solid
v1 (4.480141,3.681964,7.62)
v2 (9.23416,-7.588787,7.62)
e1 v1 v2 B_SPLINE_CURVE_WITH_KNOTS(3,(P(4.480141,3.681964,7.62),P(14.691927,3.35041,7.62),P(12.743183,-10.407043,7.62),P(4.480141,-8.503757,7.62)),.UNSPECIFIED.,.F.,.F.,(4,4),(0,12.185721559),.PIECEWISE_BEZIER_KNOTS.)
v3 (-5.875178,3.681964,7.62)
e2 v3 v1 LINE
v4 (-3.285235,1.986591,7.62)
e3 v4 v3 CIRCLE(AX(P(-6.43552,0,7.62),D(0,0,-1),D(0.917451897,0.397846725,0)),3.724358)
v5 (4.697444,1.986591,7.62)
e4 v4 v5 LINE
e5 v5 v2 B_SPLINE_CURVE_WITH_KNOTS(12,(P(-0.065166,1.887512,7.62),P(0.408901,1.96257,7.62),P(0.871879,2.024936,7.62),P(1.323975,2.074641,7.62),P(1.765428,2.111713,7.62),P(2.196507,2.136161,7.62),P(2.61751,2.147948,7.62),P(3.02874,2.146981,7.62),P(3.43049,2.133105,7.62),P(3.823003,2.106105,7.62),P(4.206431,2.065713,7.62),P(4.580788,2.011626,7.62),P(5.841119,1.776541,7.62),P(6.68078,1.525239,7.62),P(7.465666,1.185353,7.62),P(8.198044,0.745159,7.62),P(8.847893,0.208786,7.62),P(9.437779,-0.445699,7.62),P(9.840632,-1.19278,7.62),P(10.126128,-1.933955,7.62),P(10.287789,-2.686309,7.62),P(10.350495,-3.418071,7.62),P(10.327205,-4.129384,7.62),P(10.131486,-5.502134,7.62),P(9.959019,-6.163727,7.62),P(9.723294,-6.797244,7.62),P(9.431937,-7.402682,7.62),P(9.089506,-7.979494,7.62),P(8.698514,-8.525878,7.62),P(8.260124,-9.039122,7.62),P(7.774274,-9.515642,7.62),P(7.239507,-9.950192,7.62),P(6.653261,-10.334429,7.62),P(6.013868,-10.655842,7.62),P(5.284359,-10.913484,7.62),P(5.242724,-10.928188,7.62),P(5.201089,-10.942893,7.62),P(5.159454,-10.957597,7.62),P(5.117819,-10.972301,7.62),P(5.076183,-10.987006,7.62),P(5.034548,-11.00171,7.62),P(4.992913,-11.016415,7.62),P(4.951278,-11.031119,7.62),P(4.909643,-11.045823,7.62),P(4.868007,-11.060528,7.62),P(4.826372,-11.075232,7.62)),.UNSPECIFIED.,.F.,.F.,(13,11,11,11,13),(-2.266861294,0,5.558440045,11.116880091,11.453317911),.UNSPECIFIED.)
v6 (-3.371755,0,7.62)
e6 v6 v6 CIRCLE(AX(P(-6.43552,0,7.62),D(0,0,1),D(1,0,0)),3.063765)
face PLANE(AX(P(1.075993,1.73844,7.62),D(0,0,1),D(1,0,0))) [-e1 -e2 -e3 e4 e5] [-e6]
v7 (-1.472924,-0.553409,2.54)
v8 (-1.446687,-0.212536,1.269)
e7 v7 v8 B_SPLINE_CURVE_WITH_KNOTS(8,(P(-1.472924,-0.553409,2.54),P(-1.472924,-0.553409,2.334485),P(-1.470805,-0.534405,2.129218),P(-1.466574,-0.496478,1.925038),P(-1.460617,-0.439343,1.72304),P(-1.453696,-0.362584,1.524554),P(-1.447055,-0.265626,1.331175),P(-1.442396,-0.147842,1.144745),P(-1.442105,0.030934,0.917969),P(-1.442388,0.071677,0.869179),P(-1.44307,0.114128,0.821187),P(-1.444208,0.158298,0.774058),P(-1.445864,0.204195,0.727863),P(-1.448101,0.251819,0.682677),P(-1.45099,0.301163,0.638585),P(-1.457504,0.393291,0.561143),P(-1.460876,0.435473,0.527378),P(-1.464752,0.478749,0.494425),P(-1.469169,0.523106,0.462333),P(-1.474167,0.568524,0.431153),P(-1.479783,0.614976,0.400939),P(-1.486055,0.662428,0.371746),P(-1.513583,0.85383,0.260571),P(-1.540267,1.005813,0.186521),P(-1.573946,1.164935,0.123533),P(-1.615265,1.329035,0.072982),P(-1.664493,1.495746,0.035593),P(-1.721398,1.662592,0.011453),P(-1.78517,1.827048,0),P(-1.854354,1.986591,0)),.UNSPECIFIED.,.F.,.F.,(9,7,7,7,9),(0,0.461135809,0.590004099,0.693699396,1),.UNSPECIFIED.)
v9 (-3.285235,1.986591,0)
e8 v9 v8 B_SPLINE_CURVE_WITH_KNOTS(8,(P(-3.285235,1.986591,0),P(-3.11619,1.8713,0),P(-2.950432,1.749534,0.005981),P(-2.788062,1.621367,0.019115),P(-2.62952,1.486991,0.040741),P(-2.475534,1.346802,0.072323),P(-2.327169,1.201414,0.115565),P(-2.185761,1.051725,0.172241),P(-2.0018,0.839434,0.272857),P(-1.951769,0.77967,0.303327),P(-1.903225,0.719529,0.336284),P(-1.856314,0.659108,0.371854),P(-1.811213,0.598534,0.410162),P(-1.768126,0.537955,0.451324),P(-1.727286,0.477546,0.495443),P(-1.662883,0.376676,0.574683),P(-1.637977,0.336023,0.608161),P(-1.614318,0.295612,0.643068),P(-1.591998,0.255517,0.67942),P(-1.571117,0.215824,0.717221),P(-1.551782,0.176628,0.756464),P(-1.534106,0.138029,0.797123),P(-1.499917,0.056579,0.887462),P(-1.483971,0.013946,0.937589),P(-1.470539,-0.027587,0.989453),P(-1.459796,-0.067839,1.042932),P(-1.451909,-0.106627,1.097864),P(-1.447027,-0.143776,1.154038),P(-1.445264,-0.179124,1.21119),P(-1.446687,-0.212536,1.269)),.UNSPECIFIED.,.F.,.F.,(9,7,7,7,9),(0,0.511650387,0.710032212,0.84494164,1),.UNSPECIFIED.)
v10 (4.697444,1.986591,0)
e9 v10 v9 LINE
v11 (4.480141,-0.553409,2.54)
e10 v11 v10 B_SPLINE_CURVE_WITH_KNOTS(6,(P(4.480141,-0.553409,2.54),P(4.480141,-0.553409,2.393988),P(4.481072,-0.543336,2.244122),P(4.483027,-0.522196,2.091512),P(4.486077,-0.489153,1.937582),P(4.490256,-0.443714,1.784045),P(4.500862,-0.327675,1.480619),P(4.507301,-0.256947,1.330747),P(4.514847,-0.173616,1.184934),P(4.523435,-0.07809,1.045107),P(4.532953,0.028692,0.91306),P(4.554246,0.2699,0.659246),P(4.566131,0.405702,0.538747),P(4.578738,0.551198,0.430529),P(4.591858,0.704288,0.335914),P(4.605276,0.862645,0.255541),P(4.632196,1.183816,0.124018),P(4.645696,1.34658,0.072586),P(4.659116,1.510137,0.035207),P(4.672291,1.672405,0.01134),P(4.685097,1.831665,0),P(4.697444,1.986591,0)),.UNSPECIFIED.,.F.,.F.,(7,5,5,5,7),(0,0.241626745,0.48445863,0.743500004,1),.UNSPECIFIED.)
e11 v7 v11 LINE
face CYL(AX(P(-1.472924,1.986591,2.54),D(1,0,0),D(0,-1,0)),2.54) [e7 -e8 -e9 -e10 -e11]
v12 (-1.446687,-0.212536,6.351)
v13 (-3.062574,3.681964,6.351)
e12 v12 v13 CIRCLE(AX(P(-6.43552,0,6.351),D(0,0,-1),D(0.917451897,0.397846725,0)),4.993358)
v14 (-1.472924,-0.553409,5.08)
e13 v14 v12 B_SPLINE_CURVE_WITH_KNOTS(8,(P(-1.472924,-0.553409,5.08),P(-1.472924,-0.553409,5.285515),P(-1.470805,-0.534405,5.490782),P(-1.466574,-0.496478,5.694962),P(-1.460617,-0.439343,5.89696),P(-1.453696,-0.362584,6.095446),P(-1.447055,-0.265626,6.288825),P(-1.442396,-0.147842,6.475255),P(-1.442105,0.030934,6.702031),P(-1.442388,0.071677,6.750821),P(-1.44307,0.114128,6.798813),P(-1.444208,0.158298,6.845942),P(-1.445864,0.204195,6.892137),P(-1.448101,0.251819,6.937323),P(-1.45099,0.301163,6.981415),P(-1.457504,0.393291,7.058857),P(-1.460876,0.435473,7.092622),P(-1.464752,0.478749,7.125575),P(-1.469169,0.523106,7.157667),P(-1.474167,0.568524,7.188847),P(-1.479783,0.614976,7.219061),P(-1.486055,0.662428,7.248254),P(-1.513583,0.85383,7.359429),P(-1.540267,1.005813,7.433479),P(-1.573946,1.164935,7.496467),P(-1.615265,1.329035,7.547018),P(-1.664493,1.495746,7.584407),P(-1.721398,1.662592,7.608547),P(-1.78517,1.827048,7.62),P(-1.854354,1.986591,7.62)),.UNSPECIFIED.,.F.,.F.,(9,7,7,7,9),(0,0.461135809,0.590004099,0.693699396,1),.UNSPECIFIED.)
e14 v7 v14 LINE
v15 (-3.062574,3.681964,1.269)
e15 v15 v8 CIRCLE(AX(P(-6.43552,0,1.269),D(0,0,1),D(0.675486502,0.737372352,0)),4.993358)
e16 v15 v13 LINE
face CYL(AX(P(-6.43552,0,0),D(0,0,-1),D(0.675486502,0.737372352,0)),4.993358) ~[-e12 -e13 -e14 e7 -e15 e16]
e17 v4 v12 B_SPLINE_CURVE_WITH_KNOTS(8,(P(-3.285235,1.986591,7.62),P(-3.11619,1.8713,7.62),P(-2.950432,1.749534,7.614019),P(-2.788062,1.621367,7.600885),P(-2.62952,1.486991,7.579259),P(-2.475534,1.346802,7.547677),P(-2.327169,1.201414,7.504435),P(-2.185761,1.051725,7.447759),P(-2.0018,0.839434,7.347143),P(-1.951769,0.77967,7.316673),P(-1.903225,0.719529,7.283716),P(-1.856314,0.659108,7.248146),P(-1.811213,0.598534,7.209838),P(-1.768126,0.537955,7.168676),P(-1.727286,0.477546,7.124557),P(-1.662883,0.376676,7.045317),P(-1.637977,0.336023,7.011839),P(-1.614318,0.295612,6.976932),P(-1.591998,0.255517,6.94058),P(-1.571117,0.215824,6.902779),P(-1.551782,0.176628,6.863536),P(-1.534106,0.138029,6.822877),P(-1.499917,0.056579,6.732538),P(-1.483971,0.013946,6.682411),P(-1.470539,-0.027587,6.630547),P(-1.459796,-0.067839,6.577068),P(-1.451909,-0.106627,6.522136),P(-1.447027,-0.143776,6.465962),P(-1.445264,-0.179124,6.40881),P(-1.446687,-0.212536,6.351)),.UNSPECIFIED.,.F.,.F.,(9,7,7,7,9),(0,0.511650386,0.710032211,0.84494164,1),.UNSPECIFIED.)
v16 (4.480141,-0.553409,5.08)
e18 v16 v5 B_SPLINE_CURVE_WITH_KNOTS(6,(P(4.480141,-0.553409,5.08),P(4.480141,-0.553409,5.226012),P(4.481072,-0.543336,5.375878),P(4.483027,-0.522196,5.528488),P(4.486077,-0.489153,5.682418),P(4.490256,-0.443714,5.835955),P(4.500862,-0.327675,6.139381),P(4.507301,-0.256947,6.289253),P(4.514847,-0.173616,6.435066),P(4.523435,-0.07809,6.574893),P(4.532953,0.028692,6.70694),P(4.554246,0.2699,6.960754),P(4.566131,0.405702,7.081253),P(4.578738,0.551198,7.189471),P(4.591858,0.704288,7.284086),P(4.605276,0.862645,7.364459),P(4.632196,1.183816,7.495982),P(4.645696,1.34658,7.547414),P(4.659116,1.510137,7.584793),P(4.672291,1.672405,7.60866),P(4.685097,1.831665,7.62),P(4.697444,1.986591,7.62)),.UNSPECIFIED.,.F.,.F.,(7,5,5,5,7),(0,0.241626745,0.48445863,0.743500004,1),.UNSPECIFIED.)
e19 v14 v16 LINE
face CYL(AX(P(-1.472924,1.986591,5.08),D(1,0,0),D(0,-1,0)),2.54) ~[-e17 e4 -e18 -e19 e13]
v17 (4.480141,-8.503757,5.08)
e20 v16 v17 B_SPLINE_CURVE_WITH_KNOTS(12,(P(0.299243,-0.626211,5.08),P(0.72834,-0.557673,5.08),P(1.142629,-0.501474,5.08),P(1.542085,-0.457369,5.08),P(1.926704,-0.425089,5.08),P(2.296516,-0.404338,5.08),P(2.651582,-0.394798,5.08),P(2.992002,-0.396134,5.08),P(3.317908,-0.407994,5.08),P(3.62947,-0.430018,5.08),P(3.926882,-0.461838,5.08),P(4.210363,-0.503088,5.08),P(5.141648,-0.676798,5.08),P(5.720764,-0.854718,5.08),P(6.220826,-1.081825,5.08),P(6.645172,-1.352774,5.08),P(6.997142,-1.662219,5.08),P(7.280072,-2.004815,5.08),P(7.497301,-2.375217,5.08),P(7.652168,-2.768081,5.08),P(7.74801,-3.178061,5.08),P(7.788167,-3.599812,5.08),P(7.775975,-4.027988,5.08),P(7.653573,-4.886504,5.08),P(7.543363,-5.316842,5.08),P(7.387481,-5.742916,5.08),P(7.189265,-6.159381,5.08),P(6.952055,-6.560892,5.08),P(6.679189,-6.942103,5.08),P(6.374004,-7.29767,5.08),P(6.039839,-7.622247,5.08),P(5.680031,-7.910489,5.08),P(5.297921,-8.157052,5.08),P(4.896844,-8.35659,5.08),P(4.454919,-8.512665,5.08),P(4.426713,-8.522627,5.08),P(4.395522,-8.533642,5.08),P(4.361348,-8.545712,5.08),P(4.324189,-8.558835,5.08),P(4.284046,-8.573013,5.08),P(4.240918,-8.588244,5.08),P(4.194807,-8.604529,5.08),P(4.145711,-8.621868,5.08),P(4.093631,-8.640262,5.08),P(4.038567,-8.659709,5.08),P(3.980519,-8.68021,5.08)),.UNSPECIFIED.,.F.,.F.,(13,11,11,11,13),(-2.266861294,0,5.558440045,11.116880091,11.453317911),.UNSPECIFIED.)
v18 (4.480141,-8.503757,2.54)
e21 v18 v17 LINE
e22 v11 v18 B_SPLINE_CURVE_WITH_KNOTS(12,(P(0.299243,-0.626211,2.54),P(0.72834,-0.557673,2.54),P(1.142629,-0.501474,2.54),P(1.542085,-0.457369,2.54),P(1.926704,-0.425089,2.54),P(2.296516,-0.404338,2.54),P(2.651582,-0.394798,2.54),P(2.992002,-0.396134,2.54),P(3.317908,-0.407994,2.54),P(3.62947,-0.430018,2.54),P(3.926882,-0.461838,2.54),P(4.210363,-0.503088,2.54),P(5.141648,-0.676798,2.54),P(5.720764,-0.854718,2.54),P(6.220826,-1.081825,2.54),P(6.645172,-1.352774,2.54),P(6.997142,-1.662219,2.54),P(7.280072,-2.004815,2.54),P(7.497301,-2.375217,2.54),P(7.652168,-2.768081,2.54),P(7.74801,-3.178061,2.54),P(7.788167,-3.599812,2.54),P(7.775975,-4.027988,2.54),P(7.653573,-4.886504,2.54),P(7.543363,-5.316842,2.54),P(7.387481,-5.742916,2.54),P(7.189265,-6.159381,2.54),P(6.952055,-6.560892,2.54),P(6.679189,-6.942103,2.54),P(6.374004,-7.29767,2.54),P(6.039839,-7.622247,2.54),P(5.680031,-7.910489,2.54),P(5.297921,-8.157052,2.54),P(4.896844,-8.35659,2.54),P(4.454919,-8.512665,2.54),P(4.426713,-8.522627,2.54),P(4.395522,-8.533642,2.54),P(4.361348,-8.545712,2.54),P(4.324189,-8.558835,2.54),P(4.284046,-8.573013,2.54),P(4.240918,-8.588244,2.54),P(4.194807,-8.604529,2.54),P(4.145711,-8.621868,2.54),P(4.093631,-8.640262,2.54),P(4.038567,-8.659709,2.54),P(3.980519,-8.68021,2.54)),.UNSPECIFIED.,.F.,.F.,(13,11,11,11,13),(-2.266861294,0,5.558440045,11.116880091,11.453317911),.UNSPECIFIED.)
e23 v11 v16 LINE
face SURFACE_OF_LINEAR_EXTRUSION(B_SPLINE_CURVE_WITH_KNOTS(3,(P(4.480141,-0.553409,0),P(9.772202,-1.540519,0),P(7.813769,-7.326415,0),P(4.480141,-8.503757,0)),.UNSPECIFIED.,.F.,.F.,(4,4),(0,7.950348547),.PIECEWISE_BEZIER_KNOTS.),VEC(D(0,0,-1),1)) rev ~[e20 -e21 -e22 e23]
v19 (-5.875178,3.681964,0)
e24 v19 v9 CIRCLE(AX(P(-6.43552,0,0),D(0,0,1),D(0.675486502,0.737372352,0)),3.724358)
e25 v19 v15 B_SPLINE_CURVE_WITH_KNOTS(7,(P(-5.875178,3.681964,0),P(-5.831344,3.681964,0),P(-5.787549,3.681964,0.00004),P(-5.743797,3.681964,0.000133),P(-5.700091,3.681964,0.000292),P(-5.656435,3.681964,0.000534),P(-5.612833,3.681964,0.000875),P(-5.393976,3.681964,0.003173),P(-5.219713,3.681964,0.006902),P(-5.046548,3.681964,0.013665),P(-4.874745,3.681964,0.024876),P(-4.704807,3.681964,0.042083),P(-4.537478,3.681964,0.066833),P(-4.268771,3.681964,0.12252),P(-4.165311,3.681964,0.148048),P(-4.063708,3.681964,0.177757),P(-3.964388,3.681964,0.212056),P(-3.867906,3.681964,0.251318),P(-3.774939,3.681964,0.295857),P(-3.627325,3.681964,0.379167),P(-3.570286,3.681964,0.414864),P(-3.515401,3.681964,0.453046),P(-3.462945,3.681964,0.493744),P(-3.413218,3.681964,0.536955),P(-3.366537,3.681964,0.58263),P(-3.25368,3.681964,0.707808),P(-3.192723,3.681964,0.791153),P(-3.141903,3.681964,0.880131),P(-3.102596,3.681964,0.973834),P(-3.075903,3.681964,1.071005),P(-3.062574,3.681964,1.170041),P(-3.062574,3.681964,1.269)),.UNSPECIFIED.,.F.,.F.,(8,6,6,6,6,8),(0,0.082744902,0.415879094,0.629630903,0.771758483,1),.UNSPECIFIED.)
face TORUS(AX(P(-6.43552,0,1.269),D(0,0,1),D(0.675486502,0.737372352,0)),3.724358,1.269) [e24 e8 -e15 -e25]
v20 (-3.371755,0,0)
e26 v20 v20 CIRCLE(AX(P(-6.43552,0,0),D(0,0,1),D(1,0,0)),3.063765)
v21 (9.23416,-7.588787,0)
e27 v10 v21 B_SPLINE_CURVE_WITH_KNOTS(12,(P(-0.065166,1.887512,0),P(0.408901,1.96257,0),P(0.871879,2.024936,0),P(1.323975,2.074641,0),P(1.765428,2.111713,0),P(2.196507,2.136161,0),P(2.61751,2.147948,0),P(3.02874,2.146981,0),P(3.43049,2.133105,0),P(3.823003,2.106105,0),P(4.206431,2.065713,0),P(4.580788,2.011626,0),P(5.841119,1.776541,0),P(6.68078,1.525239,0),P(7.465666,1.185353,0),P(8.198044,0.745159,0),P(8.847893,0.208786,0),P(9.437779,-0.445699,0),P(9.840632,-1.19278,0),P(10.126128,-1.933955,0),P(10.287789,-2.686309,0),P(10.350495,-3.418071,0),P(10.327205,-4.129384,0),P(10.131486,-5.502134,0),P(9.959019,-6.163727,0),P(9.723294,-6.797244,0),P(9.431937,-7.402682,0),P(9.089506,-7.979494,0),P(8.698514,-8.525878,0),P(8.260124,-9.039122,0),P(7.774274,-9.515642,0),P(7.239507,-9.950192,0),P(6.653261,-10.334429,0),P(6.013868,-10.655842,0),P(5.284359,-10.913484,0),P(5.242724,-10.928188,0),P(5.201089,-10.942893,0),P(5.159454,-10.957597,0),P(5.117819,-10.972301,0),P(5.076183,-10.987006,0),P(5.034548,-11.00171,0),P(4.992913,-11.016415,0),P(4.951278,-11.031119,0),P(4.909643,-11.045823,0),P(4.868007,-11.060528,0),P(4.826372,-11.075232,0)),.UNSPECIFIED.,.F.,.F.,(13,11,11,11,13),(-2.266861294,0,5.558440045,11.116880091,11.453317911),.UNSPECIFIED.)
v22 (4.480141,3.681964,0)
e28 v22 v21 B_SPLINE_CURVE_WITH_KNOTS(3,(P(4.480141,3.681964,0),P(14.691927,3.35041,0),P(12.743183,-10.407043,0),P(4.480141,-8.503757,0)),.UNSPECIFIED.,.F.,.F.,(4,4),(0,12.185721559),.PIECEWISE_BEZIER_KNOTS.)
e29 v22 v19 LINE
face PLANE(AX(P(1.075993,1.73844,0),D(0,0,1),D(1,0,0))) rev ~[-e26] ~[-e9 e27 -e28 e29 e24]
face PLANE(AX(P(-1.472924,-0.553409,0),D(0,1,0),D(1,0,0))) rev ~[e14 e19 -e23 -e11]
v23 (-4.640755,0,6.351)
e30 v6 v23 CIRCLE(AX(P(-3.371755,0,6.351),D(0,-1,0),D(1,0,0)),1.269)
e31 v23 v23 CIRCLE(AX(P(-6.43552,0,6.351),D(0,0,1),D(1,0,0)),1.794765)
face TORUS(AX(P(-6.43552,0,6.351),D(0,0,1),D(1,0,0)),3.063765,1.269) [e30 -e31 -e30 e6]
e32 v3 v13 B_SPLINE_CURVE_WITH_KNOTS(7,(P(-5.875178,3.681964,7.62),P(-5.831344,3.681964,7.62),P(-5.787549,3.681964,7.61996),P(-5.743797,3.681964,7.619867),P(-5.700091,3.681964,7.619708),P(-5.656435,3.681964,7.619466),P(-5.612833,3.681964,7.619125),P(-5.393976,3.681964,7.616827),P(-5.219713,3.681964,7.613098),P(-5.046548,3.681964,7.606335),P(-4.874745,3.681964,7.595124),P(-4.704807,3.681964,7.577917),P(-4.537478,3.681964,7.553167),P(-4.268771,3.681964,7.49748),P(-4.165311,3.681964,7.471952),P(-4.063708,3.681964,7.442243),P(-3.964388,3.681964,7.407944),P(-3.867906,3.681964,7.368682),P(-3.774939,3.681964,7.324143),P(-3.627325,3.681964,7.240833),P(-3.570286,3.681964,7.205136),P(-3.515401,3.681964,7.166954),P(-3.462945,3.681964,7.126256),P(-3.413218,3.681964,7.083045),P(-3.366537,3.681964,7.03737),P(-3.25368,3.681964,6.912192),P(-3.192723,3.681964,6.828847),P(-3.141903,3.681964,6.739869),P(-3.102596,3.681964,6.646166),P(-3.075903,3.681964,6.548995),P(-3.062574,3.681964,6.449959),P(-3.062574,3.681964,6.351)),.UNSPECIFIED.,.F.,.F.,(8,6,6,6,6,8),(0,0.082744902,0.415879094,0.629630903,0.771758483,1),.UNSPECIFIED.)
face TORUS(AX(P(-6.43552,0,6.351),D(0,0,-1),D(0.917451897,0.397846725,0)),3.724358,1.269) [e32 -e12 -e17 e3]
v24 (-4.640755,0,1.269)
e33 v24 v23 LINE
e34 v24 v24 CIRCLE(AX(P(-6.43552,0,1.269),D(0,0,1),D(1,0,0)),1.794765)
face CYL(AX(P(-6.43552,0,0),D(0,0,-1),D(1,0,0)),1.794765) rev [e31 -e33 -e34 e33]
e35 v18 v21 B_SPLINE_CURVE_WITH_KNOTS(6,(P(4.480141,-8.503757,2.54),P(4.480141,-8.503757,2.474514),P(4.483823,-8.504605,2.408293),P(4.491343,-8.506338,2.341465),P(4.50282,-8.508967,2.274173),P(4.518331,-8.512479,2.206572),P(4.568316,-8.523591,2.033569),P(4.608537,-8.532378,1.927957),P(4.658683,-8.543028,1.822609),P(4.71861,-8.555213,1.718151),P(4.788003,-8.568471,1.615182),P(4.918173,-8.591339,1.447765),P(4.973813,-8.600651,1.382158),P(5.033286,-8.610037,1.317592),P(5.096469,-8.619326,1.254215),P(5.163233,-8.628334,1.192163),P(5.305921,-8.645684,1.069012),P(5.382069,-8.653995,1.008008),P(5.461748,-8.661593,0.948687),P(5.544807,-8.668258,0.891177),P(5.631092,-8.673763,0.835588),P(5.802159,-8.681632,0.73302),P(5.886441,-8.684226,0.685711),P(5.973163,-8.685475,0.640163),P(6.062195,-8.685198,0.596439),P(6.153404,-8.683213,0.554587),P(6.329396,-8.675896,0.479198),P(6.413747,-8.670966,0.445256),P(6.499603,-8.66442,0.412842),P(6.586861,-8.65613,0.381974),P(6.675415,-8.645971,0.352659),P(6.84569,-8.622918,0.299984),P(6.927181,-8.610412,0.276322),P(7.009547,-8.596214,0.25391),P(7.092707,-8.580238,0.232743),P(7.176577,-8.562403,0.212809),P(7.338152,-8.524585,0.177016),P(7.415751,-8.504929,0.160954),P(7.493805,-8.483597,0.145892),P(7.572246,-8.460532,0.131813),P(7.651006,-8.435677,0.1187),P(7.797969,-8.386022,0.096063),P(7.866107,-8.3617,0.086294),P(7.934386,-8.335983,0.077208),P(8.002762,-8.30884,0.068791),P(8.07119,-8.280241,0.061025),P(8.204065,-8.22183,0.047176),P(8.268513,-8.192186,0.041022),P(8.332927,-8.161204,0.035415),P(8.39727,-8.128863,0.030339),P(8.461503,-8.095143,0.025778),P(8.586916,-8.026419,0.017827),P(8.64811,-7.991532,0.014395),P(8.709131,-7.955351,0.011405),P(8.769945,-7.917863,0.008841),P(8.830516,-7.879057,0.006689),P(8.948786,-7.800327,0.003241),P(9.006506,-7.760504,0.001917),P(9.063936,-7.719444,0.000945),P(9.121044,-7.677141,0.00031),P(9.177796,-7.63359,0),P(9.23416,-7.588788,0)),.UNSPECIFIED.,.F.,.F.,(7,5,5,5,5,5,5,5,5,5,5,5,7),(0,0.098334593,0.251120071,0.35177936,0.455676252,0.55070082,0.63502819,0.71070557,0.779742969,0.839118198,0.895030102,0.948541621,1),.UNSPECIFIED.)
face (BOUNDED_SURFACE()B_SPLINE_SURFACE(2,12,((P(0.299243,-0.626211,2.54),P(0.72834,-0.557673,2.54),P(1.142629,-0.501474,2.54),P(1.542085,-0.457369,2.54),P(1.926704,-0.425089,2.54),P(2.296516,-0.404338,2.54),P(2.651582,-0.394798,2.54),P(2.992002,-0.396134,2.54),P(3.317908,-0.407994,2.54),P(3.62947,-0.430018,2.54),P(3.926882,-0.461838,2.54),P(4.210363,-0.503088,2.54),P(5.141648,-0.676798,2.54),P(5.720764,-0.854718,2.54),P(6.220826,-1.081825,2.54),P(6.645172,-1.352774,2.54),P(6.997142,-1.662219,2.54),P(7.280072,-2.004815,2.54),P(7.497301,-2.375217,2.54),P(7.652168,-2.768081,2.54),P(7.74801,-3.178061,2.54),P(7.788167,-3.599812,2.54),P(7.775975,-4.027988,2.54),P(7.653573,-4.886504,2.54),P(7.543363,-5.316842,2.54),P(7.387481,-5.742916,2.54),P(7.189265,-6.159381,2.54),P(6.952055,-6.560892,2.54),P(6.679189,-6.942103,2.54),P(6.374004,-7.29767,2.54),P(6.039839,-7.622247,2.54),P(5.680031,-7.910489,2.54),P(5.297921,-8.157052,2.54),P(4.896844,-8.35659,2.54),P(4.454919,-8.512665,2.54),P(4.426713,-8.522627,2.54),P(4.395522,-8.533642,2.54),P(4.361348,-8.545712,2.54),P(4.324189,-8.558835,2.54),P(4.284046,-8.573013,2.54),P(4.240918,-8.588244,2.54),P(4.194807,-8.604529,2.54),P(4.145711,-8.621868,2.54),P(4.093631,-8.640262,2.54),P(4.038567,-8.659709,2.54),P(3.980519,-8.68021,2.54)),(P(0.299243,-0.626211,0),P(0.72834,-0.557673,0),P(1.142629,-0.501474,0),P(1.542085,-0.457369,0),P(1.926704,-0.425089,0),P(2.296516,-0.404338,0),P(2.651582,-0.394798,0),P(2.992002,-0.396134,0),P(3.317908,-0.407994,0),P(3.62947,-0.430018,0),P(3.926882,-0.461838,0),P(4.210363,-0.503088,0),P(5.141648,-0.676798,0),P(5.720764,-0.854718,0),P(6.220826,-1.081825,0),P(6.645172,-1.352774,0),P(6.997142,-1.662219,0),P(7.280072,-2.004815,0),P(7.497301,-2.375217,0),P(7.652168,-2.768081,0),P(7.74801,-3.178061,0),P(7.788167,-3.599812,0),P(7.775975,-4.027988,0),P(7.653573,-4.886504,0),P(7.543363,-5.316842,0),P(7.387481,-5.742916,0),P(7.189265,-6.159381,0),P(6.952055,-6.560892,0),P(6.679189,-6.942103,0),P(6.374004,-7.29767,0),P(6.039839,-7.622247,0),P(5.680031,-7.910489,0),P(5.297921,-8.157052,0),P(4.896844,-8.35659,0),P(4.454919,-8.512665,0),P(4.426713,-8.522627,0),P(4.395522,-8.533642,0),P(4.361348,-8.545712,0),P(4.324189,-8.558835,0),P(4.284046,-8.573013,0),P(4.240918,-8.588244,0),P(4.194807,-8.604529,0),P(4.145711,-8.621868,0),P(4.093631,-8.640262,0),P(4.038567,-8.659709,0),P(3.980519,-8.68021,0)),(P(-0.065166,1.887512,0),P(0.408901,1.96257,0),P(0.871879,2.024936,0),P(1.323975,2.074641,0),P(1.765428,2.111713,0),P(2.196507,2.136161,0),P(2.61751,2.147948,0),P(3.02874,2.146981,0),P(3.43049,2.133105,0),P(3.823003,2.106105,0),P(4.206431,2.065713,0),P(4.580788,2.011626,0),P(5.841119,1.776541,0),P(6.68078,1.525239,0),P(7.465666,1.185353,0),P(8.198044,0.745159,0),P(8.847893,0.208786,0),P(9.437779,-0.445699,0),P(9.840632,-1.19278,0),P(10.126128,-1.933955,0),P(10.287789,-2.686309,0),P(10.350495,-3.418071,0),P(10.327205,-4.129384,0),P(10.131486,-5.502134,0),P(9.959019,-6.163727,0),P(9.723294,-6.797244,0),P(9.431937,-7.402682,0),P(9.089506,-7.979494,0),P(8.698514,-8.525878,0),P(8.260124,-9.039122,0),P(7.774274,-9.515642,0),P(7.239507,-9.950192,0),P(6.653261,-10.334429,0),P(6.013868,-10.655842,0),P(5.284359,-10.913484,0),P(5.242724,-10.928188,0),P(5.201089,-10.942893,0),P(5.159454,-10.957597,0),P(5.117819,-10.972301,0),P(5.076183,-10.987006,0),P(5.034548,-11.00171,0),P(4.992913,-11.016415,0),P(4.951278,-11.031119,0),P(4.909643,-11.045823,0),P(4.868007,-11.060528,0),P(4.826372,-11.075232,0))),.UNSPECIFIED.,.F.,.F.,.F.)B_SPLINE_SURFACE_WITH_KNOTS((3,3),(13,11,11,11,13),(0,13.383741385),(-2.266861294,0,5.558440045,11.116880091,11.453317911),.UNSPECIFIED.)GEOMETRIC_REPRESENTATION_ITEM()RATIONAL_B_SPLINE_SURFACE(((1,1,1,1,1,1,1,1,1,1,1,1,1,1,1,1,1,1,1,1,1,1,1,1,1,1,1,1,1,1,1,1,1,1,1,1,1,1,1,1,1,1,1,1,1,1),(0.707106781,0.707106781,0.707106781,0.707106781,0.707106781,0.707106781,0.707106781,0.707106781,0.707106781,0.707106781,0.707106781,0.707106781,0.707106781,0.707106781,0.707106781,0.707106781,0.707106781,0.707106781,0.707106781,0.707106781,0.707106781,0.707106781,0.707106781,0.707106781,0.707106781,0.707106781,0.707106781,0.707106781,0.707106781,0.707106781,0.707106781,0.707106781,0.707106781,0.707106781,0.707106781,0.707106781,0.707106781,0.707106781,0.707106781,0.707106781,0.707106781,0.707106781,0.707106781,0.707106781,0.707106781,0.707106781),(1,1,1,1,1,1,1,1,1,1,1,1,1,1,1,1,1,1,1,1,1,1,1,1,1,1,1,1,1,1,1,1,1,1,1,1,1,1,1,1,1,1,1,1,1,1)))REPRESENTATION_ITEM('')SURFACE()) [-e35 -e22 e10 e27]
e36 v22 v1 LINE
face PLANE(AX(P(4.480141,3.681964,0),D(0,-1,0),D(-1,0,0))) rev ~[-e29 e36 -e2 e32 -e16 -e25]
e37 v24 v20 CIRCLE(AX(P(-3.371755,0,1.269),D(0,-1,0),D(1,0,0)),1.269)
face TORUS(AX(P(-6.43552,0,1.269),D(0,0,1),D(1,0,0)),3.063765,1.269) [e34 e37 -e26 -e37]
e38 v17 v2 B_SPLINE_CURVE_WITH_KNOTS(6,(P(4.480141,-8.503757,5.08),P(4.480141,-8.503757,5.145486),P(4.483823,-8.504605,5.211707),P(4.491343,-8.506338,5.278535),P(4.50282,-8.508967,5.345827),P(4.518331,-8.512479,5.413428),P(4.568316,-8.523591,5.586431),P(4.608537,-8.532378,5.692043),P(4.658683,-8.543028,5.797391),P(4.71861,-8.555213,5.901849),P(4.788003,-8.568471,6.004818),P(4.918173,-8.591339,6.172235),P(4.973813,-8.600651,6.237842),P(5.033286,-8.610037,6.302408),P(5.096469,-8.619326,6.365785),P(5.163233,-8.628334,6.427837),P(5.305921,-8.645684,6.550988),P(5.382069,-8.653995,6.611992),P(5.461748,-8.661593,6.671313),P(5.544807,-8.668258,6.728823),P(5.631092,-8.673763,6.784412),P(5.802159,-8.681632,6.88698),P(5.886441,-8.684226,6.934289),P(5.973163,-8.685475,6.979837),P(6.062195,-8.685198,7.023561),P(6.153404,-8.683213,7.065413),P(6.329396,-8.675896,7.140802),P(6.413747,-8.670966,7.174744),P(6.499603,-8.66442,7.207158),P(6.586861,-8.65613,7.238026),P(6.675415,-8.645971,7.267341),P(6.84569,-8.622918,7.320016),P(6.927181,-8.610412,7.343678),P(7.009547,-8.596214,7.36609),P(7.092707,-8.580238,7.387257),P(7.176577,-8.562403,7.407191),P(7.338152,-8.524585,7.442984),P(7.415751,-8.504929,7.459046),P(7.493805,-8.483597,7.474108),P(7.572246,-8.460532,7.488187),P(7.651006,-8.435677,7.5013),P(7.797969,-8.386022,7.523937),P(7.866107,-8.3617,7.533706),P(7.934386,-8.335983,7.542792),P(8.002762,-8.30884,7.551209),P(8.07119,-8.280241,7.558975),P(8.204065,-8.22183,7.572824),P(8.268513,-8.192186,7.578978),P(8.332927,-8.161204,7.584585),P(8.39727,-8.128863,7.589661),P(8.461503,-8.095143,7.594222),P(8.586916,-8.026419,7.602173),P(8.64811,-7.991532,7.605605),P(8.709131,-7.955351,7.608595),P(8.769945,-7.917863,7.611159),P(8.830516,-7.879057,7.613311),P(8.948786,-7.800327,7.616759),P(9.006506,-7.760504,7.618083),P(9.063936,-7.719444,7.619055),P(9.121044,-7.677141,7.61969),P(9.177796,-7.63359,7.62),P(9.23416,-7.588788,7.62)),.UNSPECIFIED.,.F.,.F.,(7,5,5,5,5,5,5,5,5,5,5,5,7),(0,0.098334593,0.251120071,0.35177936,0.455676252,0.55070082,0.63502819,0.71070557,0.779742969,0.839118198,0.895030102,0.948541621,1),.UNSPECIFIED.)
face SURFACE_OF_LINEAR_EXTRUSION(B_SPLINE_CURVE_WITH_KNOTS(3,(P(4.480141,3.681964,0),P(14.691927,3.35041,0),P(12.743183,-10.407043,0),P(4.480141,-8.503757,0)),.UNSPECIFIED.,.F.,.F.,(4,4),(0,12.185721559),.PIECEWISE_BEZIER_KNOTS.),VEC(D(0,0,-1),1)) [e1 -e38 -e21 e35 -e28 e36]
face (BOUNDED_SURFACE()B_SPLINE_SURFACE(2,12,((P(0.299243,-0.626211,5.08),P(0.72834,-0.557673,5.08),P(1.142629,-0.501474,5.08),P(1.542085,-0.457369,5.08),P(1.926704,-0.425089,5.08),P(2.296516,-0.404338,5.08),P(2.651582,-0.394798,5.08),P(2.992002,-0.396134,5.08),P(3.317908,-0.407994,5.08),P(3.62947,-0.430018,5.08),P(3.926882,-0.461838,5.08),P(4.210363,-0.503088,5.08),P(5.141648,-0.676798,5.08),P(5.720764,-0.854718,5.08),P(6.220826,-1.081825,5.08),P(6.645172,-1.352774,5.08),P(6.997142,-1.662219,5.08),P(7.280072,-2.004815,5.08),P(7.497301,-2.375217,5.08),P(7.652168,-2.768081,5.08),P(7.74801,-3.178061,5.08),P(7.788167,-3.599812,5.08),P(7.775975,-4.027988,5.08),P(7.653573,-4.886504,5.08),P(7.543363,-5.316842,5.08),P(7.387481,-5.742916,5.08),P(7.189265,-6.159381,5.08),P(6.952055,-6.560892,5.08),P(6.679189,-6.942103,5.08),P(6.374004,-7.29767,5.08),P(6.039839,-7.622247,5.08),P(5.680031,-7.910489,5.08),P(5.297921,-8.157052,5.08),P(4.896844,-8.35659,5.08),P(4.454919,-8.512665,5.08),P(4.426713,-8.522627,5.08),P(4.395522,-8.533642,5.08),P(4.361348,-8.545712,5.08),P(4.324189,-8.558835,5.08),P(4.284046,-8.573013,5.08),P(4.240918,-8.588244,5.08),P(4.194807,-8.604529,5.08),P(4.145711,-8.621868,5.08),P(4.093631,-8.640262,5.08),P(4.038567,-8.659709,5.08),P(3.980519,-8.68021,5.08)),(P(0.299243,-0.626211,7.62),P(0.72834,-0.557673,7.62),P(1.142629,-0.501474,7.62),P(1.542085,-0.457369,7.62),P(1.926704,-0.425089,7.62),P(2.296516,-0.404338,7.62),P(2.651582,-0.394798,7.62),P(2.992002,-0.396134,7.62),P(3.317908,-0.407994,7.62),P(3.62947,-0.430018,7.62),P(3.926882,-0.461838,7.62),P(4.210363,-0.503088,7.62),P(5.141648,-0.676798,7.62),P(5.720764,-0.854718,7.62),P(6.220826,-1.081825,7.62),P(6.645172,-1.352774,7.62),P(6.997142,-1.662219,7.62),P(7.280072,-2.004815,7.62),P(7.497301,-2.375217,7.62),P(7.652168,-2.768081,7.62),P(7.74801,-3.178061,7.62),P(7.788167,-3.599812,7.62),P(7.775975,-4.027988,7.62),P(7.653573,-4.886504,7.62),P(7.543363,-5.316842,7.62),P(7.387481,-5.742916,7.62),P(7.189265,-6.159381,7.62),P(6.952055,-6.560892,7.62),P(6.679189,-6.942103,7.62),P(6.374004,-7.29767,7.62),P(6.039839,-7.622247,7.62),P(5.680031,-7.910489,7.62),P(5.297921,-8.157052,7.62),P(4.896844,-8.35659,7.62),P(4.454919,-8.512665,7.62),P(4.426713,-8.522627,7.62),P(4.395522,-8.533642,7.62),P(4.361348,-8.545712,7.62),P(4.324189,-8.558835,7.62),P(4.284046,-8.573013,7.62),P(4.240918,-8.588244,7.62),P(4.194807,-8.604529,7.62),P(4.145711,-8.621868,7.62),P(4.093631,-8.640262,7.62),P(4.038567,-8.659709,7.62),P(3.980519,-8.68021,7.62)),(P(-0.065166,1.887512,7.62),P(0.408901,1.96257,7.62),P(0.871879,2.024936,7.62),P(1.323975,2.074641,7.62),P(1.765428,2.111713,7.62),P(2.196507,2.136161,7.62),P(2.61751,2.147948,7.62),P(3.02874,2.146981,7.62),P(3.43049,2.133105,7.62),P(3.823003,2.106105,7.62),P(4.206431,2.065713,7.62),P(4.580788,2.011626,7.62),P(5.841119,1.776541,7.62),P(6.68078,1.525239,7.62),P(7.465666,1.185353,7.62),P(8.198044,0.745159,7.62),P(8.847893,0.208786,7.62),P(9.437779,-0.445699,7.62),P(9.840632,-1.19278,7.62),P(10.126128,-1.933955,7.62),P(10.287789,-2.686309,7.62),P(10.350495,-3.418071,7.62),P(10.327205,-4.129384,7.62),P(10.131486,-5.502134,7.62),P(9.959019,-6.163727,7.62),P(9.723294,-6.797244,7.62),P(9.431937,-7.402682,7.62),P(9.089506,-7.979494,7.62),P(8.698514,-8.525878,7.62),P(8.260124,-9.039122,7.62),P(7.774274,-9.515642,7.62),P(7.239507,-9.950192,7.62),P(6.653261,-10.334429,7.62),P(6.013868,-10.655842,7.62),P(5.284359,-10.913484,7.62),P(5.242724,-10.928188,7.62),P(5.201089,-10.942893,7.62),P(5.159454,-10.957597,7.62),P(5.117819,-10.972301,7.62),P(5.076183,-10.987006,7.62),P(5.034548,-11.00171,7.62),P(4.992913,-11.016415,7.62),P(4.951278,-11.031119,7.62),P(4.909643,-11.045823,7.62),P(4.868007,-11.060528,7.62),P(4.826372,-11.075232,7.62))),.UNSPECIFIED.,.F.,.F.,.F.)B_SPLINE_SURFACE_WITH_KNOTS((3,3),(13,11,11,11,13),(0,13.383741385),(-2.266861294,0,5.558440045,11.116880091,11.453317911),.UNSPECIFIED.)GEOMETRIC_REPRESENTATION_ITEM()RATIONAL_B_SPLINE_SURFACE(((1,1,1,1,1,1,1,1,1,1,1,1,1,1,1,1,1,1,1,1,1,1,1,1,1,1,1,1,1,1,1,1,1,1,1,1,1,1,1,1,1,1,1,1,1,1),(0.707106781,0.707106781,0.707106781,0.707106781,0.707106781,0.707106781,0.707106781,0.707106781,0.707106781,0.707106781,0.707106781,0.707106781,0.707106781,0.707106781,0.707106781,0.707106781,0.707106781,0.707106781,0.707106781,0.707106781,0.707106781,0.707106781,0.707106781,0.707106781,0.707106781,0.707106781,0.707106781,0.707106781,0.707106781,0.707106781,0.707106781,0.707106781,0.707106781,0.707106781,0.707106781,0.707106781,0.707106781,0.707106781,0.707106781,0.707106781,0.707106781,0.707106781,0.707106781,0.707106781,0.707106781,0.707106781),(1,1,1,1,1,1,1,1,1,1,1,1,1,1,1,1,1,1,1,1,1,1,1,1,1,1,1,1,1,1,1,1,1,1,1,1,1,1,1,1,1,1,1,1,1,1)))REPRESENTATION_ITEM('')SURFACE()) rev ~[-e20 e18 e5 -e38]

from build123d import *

# Parameters (mm, degrees)
F0_R     = 1.7947651686
F1_DEPTH = 7.62
F2_R     = 2.54
F3_R     = 1.269


# Not quite as in the source:
# - a fillet or chamfer is up to 0.001 mm smaller than in the source, because OpenCascade refuses the exact size


with BuildPart() as f1:
    # F0 (on Top) → F1 (new body)
    with BuildSketch(Plane.XY):
        with BuildLine():
            ThreePointArc((-3.0625740785, 3.6819641418), (-1.865183548, 2.011379827), (-1.4421620036, 0))
            ThreePointArc((-1.4421620036, 0), (-1.4498583422, -0.2771315824), (-1.4729236329, -0.5534088705))
            Line((-1.4729236329, -0.5534088705), (4.4801407494, -0.5534088705))
            Line((4.4801407494, -0.5534088705), (4.4801407494, 3.6819641418))
            Line((4.4801407494, 3.6819641418), (-3.0625740785, 3.6819641418))
        make_face()
        with BuildLine():
            add(Edge.make_bspline(
                [(4.4801407494, 3.6819641418), (14.6919268718, 3.3504103776), (12.7431834117, -10.4070426896), (4.4801407494, -8.5037574172)],
                knots=[0, 0, 0, 0, 12.185721559, 12.185721559, 12.185721559, 12.185721559], degree=3))
            Line((4.4801407494, 3.6819641418), (4.4801407494, -0.5534088705))
            add(Edge.make_bspline(
                [(4.4801407494, -0.5534088705), (9.772202, -1.5405191807), (7.8137687942, -7.3264148086), (4.4801407494, -8.5037574172)],
                knots=[0, 0, 0, 0, 7.9503485467, 7.9503485467, 7.9503485467, 7.9503485467], degree=3))
        make_face()
        with BuildLine():
            ThreePointArc((-1.4729236329, -0.5534088705), (-1.4498583422, -0.2771315824), (-1.4421620036, 0))
            ThreePointArc((-1.4421620036, 0), (-1.865183548, 2.011379827), (-3.0625740785, 3.6819641418))
            ThreePointArc((-3.0625740785, 3.6819641418), (-11.1104438204, -1.7546257881), (-1.4729236329, -0.5534088705))
        make_face()
        with Locations((-6.4355200157, 0)):
            Circle(F0_R, mode=Mode.SUBTRACT)
    extrude(amount=F1_DEPTH)

    # F2
    f2_edges = [f1.edges().sort_by_distance(p)[0] for p in [
        (1.503609, -0.553409, 7.62),
        (7.731849, -4.321745, 7.62),
        (1.503609, -0.553409, 0),
        (7.731849, -4.321745, 0),
    ]]
    fillet(f2_edges, radius=F2_R)

    # F3 (radius 1.27 in the source; OpenCascade refuses exactly that, so slightly less here)
    f3_edges = [f1.edges().sort_by_distance(p)[0] for p in [
        (-11.110444, -1.754626, 7.62),
        (-11.110444, -1.754626, 0),
        (-8.230285, 0, 0),
        (-8.230285, 0, 7.62),
    ]]
    fillet(f3_edges, radius=F3_R)


solid = f1.part
